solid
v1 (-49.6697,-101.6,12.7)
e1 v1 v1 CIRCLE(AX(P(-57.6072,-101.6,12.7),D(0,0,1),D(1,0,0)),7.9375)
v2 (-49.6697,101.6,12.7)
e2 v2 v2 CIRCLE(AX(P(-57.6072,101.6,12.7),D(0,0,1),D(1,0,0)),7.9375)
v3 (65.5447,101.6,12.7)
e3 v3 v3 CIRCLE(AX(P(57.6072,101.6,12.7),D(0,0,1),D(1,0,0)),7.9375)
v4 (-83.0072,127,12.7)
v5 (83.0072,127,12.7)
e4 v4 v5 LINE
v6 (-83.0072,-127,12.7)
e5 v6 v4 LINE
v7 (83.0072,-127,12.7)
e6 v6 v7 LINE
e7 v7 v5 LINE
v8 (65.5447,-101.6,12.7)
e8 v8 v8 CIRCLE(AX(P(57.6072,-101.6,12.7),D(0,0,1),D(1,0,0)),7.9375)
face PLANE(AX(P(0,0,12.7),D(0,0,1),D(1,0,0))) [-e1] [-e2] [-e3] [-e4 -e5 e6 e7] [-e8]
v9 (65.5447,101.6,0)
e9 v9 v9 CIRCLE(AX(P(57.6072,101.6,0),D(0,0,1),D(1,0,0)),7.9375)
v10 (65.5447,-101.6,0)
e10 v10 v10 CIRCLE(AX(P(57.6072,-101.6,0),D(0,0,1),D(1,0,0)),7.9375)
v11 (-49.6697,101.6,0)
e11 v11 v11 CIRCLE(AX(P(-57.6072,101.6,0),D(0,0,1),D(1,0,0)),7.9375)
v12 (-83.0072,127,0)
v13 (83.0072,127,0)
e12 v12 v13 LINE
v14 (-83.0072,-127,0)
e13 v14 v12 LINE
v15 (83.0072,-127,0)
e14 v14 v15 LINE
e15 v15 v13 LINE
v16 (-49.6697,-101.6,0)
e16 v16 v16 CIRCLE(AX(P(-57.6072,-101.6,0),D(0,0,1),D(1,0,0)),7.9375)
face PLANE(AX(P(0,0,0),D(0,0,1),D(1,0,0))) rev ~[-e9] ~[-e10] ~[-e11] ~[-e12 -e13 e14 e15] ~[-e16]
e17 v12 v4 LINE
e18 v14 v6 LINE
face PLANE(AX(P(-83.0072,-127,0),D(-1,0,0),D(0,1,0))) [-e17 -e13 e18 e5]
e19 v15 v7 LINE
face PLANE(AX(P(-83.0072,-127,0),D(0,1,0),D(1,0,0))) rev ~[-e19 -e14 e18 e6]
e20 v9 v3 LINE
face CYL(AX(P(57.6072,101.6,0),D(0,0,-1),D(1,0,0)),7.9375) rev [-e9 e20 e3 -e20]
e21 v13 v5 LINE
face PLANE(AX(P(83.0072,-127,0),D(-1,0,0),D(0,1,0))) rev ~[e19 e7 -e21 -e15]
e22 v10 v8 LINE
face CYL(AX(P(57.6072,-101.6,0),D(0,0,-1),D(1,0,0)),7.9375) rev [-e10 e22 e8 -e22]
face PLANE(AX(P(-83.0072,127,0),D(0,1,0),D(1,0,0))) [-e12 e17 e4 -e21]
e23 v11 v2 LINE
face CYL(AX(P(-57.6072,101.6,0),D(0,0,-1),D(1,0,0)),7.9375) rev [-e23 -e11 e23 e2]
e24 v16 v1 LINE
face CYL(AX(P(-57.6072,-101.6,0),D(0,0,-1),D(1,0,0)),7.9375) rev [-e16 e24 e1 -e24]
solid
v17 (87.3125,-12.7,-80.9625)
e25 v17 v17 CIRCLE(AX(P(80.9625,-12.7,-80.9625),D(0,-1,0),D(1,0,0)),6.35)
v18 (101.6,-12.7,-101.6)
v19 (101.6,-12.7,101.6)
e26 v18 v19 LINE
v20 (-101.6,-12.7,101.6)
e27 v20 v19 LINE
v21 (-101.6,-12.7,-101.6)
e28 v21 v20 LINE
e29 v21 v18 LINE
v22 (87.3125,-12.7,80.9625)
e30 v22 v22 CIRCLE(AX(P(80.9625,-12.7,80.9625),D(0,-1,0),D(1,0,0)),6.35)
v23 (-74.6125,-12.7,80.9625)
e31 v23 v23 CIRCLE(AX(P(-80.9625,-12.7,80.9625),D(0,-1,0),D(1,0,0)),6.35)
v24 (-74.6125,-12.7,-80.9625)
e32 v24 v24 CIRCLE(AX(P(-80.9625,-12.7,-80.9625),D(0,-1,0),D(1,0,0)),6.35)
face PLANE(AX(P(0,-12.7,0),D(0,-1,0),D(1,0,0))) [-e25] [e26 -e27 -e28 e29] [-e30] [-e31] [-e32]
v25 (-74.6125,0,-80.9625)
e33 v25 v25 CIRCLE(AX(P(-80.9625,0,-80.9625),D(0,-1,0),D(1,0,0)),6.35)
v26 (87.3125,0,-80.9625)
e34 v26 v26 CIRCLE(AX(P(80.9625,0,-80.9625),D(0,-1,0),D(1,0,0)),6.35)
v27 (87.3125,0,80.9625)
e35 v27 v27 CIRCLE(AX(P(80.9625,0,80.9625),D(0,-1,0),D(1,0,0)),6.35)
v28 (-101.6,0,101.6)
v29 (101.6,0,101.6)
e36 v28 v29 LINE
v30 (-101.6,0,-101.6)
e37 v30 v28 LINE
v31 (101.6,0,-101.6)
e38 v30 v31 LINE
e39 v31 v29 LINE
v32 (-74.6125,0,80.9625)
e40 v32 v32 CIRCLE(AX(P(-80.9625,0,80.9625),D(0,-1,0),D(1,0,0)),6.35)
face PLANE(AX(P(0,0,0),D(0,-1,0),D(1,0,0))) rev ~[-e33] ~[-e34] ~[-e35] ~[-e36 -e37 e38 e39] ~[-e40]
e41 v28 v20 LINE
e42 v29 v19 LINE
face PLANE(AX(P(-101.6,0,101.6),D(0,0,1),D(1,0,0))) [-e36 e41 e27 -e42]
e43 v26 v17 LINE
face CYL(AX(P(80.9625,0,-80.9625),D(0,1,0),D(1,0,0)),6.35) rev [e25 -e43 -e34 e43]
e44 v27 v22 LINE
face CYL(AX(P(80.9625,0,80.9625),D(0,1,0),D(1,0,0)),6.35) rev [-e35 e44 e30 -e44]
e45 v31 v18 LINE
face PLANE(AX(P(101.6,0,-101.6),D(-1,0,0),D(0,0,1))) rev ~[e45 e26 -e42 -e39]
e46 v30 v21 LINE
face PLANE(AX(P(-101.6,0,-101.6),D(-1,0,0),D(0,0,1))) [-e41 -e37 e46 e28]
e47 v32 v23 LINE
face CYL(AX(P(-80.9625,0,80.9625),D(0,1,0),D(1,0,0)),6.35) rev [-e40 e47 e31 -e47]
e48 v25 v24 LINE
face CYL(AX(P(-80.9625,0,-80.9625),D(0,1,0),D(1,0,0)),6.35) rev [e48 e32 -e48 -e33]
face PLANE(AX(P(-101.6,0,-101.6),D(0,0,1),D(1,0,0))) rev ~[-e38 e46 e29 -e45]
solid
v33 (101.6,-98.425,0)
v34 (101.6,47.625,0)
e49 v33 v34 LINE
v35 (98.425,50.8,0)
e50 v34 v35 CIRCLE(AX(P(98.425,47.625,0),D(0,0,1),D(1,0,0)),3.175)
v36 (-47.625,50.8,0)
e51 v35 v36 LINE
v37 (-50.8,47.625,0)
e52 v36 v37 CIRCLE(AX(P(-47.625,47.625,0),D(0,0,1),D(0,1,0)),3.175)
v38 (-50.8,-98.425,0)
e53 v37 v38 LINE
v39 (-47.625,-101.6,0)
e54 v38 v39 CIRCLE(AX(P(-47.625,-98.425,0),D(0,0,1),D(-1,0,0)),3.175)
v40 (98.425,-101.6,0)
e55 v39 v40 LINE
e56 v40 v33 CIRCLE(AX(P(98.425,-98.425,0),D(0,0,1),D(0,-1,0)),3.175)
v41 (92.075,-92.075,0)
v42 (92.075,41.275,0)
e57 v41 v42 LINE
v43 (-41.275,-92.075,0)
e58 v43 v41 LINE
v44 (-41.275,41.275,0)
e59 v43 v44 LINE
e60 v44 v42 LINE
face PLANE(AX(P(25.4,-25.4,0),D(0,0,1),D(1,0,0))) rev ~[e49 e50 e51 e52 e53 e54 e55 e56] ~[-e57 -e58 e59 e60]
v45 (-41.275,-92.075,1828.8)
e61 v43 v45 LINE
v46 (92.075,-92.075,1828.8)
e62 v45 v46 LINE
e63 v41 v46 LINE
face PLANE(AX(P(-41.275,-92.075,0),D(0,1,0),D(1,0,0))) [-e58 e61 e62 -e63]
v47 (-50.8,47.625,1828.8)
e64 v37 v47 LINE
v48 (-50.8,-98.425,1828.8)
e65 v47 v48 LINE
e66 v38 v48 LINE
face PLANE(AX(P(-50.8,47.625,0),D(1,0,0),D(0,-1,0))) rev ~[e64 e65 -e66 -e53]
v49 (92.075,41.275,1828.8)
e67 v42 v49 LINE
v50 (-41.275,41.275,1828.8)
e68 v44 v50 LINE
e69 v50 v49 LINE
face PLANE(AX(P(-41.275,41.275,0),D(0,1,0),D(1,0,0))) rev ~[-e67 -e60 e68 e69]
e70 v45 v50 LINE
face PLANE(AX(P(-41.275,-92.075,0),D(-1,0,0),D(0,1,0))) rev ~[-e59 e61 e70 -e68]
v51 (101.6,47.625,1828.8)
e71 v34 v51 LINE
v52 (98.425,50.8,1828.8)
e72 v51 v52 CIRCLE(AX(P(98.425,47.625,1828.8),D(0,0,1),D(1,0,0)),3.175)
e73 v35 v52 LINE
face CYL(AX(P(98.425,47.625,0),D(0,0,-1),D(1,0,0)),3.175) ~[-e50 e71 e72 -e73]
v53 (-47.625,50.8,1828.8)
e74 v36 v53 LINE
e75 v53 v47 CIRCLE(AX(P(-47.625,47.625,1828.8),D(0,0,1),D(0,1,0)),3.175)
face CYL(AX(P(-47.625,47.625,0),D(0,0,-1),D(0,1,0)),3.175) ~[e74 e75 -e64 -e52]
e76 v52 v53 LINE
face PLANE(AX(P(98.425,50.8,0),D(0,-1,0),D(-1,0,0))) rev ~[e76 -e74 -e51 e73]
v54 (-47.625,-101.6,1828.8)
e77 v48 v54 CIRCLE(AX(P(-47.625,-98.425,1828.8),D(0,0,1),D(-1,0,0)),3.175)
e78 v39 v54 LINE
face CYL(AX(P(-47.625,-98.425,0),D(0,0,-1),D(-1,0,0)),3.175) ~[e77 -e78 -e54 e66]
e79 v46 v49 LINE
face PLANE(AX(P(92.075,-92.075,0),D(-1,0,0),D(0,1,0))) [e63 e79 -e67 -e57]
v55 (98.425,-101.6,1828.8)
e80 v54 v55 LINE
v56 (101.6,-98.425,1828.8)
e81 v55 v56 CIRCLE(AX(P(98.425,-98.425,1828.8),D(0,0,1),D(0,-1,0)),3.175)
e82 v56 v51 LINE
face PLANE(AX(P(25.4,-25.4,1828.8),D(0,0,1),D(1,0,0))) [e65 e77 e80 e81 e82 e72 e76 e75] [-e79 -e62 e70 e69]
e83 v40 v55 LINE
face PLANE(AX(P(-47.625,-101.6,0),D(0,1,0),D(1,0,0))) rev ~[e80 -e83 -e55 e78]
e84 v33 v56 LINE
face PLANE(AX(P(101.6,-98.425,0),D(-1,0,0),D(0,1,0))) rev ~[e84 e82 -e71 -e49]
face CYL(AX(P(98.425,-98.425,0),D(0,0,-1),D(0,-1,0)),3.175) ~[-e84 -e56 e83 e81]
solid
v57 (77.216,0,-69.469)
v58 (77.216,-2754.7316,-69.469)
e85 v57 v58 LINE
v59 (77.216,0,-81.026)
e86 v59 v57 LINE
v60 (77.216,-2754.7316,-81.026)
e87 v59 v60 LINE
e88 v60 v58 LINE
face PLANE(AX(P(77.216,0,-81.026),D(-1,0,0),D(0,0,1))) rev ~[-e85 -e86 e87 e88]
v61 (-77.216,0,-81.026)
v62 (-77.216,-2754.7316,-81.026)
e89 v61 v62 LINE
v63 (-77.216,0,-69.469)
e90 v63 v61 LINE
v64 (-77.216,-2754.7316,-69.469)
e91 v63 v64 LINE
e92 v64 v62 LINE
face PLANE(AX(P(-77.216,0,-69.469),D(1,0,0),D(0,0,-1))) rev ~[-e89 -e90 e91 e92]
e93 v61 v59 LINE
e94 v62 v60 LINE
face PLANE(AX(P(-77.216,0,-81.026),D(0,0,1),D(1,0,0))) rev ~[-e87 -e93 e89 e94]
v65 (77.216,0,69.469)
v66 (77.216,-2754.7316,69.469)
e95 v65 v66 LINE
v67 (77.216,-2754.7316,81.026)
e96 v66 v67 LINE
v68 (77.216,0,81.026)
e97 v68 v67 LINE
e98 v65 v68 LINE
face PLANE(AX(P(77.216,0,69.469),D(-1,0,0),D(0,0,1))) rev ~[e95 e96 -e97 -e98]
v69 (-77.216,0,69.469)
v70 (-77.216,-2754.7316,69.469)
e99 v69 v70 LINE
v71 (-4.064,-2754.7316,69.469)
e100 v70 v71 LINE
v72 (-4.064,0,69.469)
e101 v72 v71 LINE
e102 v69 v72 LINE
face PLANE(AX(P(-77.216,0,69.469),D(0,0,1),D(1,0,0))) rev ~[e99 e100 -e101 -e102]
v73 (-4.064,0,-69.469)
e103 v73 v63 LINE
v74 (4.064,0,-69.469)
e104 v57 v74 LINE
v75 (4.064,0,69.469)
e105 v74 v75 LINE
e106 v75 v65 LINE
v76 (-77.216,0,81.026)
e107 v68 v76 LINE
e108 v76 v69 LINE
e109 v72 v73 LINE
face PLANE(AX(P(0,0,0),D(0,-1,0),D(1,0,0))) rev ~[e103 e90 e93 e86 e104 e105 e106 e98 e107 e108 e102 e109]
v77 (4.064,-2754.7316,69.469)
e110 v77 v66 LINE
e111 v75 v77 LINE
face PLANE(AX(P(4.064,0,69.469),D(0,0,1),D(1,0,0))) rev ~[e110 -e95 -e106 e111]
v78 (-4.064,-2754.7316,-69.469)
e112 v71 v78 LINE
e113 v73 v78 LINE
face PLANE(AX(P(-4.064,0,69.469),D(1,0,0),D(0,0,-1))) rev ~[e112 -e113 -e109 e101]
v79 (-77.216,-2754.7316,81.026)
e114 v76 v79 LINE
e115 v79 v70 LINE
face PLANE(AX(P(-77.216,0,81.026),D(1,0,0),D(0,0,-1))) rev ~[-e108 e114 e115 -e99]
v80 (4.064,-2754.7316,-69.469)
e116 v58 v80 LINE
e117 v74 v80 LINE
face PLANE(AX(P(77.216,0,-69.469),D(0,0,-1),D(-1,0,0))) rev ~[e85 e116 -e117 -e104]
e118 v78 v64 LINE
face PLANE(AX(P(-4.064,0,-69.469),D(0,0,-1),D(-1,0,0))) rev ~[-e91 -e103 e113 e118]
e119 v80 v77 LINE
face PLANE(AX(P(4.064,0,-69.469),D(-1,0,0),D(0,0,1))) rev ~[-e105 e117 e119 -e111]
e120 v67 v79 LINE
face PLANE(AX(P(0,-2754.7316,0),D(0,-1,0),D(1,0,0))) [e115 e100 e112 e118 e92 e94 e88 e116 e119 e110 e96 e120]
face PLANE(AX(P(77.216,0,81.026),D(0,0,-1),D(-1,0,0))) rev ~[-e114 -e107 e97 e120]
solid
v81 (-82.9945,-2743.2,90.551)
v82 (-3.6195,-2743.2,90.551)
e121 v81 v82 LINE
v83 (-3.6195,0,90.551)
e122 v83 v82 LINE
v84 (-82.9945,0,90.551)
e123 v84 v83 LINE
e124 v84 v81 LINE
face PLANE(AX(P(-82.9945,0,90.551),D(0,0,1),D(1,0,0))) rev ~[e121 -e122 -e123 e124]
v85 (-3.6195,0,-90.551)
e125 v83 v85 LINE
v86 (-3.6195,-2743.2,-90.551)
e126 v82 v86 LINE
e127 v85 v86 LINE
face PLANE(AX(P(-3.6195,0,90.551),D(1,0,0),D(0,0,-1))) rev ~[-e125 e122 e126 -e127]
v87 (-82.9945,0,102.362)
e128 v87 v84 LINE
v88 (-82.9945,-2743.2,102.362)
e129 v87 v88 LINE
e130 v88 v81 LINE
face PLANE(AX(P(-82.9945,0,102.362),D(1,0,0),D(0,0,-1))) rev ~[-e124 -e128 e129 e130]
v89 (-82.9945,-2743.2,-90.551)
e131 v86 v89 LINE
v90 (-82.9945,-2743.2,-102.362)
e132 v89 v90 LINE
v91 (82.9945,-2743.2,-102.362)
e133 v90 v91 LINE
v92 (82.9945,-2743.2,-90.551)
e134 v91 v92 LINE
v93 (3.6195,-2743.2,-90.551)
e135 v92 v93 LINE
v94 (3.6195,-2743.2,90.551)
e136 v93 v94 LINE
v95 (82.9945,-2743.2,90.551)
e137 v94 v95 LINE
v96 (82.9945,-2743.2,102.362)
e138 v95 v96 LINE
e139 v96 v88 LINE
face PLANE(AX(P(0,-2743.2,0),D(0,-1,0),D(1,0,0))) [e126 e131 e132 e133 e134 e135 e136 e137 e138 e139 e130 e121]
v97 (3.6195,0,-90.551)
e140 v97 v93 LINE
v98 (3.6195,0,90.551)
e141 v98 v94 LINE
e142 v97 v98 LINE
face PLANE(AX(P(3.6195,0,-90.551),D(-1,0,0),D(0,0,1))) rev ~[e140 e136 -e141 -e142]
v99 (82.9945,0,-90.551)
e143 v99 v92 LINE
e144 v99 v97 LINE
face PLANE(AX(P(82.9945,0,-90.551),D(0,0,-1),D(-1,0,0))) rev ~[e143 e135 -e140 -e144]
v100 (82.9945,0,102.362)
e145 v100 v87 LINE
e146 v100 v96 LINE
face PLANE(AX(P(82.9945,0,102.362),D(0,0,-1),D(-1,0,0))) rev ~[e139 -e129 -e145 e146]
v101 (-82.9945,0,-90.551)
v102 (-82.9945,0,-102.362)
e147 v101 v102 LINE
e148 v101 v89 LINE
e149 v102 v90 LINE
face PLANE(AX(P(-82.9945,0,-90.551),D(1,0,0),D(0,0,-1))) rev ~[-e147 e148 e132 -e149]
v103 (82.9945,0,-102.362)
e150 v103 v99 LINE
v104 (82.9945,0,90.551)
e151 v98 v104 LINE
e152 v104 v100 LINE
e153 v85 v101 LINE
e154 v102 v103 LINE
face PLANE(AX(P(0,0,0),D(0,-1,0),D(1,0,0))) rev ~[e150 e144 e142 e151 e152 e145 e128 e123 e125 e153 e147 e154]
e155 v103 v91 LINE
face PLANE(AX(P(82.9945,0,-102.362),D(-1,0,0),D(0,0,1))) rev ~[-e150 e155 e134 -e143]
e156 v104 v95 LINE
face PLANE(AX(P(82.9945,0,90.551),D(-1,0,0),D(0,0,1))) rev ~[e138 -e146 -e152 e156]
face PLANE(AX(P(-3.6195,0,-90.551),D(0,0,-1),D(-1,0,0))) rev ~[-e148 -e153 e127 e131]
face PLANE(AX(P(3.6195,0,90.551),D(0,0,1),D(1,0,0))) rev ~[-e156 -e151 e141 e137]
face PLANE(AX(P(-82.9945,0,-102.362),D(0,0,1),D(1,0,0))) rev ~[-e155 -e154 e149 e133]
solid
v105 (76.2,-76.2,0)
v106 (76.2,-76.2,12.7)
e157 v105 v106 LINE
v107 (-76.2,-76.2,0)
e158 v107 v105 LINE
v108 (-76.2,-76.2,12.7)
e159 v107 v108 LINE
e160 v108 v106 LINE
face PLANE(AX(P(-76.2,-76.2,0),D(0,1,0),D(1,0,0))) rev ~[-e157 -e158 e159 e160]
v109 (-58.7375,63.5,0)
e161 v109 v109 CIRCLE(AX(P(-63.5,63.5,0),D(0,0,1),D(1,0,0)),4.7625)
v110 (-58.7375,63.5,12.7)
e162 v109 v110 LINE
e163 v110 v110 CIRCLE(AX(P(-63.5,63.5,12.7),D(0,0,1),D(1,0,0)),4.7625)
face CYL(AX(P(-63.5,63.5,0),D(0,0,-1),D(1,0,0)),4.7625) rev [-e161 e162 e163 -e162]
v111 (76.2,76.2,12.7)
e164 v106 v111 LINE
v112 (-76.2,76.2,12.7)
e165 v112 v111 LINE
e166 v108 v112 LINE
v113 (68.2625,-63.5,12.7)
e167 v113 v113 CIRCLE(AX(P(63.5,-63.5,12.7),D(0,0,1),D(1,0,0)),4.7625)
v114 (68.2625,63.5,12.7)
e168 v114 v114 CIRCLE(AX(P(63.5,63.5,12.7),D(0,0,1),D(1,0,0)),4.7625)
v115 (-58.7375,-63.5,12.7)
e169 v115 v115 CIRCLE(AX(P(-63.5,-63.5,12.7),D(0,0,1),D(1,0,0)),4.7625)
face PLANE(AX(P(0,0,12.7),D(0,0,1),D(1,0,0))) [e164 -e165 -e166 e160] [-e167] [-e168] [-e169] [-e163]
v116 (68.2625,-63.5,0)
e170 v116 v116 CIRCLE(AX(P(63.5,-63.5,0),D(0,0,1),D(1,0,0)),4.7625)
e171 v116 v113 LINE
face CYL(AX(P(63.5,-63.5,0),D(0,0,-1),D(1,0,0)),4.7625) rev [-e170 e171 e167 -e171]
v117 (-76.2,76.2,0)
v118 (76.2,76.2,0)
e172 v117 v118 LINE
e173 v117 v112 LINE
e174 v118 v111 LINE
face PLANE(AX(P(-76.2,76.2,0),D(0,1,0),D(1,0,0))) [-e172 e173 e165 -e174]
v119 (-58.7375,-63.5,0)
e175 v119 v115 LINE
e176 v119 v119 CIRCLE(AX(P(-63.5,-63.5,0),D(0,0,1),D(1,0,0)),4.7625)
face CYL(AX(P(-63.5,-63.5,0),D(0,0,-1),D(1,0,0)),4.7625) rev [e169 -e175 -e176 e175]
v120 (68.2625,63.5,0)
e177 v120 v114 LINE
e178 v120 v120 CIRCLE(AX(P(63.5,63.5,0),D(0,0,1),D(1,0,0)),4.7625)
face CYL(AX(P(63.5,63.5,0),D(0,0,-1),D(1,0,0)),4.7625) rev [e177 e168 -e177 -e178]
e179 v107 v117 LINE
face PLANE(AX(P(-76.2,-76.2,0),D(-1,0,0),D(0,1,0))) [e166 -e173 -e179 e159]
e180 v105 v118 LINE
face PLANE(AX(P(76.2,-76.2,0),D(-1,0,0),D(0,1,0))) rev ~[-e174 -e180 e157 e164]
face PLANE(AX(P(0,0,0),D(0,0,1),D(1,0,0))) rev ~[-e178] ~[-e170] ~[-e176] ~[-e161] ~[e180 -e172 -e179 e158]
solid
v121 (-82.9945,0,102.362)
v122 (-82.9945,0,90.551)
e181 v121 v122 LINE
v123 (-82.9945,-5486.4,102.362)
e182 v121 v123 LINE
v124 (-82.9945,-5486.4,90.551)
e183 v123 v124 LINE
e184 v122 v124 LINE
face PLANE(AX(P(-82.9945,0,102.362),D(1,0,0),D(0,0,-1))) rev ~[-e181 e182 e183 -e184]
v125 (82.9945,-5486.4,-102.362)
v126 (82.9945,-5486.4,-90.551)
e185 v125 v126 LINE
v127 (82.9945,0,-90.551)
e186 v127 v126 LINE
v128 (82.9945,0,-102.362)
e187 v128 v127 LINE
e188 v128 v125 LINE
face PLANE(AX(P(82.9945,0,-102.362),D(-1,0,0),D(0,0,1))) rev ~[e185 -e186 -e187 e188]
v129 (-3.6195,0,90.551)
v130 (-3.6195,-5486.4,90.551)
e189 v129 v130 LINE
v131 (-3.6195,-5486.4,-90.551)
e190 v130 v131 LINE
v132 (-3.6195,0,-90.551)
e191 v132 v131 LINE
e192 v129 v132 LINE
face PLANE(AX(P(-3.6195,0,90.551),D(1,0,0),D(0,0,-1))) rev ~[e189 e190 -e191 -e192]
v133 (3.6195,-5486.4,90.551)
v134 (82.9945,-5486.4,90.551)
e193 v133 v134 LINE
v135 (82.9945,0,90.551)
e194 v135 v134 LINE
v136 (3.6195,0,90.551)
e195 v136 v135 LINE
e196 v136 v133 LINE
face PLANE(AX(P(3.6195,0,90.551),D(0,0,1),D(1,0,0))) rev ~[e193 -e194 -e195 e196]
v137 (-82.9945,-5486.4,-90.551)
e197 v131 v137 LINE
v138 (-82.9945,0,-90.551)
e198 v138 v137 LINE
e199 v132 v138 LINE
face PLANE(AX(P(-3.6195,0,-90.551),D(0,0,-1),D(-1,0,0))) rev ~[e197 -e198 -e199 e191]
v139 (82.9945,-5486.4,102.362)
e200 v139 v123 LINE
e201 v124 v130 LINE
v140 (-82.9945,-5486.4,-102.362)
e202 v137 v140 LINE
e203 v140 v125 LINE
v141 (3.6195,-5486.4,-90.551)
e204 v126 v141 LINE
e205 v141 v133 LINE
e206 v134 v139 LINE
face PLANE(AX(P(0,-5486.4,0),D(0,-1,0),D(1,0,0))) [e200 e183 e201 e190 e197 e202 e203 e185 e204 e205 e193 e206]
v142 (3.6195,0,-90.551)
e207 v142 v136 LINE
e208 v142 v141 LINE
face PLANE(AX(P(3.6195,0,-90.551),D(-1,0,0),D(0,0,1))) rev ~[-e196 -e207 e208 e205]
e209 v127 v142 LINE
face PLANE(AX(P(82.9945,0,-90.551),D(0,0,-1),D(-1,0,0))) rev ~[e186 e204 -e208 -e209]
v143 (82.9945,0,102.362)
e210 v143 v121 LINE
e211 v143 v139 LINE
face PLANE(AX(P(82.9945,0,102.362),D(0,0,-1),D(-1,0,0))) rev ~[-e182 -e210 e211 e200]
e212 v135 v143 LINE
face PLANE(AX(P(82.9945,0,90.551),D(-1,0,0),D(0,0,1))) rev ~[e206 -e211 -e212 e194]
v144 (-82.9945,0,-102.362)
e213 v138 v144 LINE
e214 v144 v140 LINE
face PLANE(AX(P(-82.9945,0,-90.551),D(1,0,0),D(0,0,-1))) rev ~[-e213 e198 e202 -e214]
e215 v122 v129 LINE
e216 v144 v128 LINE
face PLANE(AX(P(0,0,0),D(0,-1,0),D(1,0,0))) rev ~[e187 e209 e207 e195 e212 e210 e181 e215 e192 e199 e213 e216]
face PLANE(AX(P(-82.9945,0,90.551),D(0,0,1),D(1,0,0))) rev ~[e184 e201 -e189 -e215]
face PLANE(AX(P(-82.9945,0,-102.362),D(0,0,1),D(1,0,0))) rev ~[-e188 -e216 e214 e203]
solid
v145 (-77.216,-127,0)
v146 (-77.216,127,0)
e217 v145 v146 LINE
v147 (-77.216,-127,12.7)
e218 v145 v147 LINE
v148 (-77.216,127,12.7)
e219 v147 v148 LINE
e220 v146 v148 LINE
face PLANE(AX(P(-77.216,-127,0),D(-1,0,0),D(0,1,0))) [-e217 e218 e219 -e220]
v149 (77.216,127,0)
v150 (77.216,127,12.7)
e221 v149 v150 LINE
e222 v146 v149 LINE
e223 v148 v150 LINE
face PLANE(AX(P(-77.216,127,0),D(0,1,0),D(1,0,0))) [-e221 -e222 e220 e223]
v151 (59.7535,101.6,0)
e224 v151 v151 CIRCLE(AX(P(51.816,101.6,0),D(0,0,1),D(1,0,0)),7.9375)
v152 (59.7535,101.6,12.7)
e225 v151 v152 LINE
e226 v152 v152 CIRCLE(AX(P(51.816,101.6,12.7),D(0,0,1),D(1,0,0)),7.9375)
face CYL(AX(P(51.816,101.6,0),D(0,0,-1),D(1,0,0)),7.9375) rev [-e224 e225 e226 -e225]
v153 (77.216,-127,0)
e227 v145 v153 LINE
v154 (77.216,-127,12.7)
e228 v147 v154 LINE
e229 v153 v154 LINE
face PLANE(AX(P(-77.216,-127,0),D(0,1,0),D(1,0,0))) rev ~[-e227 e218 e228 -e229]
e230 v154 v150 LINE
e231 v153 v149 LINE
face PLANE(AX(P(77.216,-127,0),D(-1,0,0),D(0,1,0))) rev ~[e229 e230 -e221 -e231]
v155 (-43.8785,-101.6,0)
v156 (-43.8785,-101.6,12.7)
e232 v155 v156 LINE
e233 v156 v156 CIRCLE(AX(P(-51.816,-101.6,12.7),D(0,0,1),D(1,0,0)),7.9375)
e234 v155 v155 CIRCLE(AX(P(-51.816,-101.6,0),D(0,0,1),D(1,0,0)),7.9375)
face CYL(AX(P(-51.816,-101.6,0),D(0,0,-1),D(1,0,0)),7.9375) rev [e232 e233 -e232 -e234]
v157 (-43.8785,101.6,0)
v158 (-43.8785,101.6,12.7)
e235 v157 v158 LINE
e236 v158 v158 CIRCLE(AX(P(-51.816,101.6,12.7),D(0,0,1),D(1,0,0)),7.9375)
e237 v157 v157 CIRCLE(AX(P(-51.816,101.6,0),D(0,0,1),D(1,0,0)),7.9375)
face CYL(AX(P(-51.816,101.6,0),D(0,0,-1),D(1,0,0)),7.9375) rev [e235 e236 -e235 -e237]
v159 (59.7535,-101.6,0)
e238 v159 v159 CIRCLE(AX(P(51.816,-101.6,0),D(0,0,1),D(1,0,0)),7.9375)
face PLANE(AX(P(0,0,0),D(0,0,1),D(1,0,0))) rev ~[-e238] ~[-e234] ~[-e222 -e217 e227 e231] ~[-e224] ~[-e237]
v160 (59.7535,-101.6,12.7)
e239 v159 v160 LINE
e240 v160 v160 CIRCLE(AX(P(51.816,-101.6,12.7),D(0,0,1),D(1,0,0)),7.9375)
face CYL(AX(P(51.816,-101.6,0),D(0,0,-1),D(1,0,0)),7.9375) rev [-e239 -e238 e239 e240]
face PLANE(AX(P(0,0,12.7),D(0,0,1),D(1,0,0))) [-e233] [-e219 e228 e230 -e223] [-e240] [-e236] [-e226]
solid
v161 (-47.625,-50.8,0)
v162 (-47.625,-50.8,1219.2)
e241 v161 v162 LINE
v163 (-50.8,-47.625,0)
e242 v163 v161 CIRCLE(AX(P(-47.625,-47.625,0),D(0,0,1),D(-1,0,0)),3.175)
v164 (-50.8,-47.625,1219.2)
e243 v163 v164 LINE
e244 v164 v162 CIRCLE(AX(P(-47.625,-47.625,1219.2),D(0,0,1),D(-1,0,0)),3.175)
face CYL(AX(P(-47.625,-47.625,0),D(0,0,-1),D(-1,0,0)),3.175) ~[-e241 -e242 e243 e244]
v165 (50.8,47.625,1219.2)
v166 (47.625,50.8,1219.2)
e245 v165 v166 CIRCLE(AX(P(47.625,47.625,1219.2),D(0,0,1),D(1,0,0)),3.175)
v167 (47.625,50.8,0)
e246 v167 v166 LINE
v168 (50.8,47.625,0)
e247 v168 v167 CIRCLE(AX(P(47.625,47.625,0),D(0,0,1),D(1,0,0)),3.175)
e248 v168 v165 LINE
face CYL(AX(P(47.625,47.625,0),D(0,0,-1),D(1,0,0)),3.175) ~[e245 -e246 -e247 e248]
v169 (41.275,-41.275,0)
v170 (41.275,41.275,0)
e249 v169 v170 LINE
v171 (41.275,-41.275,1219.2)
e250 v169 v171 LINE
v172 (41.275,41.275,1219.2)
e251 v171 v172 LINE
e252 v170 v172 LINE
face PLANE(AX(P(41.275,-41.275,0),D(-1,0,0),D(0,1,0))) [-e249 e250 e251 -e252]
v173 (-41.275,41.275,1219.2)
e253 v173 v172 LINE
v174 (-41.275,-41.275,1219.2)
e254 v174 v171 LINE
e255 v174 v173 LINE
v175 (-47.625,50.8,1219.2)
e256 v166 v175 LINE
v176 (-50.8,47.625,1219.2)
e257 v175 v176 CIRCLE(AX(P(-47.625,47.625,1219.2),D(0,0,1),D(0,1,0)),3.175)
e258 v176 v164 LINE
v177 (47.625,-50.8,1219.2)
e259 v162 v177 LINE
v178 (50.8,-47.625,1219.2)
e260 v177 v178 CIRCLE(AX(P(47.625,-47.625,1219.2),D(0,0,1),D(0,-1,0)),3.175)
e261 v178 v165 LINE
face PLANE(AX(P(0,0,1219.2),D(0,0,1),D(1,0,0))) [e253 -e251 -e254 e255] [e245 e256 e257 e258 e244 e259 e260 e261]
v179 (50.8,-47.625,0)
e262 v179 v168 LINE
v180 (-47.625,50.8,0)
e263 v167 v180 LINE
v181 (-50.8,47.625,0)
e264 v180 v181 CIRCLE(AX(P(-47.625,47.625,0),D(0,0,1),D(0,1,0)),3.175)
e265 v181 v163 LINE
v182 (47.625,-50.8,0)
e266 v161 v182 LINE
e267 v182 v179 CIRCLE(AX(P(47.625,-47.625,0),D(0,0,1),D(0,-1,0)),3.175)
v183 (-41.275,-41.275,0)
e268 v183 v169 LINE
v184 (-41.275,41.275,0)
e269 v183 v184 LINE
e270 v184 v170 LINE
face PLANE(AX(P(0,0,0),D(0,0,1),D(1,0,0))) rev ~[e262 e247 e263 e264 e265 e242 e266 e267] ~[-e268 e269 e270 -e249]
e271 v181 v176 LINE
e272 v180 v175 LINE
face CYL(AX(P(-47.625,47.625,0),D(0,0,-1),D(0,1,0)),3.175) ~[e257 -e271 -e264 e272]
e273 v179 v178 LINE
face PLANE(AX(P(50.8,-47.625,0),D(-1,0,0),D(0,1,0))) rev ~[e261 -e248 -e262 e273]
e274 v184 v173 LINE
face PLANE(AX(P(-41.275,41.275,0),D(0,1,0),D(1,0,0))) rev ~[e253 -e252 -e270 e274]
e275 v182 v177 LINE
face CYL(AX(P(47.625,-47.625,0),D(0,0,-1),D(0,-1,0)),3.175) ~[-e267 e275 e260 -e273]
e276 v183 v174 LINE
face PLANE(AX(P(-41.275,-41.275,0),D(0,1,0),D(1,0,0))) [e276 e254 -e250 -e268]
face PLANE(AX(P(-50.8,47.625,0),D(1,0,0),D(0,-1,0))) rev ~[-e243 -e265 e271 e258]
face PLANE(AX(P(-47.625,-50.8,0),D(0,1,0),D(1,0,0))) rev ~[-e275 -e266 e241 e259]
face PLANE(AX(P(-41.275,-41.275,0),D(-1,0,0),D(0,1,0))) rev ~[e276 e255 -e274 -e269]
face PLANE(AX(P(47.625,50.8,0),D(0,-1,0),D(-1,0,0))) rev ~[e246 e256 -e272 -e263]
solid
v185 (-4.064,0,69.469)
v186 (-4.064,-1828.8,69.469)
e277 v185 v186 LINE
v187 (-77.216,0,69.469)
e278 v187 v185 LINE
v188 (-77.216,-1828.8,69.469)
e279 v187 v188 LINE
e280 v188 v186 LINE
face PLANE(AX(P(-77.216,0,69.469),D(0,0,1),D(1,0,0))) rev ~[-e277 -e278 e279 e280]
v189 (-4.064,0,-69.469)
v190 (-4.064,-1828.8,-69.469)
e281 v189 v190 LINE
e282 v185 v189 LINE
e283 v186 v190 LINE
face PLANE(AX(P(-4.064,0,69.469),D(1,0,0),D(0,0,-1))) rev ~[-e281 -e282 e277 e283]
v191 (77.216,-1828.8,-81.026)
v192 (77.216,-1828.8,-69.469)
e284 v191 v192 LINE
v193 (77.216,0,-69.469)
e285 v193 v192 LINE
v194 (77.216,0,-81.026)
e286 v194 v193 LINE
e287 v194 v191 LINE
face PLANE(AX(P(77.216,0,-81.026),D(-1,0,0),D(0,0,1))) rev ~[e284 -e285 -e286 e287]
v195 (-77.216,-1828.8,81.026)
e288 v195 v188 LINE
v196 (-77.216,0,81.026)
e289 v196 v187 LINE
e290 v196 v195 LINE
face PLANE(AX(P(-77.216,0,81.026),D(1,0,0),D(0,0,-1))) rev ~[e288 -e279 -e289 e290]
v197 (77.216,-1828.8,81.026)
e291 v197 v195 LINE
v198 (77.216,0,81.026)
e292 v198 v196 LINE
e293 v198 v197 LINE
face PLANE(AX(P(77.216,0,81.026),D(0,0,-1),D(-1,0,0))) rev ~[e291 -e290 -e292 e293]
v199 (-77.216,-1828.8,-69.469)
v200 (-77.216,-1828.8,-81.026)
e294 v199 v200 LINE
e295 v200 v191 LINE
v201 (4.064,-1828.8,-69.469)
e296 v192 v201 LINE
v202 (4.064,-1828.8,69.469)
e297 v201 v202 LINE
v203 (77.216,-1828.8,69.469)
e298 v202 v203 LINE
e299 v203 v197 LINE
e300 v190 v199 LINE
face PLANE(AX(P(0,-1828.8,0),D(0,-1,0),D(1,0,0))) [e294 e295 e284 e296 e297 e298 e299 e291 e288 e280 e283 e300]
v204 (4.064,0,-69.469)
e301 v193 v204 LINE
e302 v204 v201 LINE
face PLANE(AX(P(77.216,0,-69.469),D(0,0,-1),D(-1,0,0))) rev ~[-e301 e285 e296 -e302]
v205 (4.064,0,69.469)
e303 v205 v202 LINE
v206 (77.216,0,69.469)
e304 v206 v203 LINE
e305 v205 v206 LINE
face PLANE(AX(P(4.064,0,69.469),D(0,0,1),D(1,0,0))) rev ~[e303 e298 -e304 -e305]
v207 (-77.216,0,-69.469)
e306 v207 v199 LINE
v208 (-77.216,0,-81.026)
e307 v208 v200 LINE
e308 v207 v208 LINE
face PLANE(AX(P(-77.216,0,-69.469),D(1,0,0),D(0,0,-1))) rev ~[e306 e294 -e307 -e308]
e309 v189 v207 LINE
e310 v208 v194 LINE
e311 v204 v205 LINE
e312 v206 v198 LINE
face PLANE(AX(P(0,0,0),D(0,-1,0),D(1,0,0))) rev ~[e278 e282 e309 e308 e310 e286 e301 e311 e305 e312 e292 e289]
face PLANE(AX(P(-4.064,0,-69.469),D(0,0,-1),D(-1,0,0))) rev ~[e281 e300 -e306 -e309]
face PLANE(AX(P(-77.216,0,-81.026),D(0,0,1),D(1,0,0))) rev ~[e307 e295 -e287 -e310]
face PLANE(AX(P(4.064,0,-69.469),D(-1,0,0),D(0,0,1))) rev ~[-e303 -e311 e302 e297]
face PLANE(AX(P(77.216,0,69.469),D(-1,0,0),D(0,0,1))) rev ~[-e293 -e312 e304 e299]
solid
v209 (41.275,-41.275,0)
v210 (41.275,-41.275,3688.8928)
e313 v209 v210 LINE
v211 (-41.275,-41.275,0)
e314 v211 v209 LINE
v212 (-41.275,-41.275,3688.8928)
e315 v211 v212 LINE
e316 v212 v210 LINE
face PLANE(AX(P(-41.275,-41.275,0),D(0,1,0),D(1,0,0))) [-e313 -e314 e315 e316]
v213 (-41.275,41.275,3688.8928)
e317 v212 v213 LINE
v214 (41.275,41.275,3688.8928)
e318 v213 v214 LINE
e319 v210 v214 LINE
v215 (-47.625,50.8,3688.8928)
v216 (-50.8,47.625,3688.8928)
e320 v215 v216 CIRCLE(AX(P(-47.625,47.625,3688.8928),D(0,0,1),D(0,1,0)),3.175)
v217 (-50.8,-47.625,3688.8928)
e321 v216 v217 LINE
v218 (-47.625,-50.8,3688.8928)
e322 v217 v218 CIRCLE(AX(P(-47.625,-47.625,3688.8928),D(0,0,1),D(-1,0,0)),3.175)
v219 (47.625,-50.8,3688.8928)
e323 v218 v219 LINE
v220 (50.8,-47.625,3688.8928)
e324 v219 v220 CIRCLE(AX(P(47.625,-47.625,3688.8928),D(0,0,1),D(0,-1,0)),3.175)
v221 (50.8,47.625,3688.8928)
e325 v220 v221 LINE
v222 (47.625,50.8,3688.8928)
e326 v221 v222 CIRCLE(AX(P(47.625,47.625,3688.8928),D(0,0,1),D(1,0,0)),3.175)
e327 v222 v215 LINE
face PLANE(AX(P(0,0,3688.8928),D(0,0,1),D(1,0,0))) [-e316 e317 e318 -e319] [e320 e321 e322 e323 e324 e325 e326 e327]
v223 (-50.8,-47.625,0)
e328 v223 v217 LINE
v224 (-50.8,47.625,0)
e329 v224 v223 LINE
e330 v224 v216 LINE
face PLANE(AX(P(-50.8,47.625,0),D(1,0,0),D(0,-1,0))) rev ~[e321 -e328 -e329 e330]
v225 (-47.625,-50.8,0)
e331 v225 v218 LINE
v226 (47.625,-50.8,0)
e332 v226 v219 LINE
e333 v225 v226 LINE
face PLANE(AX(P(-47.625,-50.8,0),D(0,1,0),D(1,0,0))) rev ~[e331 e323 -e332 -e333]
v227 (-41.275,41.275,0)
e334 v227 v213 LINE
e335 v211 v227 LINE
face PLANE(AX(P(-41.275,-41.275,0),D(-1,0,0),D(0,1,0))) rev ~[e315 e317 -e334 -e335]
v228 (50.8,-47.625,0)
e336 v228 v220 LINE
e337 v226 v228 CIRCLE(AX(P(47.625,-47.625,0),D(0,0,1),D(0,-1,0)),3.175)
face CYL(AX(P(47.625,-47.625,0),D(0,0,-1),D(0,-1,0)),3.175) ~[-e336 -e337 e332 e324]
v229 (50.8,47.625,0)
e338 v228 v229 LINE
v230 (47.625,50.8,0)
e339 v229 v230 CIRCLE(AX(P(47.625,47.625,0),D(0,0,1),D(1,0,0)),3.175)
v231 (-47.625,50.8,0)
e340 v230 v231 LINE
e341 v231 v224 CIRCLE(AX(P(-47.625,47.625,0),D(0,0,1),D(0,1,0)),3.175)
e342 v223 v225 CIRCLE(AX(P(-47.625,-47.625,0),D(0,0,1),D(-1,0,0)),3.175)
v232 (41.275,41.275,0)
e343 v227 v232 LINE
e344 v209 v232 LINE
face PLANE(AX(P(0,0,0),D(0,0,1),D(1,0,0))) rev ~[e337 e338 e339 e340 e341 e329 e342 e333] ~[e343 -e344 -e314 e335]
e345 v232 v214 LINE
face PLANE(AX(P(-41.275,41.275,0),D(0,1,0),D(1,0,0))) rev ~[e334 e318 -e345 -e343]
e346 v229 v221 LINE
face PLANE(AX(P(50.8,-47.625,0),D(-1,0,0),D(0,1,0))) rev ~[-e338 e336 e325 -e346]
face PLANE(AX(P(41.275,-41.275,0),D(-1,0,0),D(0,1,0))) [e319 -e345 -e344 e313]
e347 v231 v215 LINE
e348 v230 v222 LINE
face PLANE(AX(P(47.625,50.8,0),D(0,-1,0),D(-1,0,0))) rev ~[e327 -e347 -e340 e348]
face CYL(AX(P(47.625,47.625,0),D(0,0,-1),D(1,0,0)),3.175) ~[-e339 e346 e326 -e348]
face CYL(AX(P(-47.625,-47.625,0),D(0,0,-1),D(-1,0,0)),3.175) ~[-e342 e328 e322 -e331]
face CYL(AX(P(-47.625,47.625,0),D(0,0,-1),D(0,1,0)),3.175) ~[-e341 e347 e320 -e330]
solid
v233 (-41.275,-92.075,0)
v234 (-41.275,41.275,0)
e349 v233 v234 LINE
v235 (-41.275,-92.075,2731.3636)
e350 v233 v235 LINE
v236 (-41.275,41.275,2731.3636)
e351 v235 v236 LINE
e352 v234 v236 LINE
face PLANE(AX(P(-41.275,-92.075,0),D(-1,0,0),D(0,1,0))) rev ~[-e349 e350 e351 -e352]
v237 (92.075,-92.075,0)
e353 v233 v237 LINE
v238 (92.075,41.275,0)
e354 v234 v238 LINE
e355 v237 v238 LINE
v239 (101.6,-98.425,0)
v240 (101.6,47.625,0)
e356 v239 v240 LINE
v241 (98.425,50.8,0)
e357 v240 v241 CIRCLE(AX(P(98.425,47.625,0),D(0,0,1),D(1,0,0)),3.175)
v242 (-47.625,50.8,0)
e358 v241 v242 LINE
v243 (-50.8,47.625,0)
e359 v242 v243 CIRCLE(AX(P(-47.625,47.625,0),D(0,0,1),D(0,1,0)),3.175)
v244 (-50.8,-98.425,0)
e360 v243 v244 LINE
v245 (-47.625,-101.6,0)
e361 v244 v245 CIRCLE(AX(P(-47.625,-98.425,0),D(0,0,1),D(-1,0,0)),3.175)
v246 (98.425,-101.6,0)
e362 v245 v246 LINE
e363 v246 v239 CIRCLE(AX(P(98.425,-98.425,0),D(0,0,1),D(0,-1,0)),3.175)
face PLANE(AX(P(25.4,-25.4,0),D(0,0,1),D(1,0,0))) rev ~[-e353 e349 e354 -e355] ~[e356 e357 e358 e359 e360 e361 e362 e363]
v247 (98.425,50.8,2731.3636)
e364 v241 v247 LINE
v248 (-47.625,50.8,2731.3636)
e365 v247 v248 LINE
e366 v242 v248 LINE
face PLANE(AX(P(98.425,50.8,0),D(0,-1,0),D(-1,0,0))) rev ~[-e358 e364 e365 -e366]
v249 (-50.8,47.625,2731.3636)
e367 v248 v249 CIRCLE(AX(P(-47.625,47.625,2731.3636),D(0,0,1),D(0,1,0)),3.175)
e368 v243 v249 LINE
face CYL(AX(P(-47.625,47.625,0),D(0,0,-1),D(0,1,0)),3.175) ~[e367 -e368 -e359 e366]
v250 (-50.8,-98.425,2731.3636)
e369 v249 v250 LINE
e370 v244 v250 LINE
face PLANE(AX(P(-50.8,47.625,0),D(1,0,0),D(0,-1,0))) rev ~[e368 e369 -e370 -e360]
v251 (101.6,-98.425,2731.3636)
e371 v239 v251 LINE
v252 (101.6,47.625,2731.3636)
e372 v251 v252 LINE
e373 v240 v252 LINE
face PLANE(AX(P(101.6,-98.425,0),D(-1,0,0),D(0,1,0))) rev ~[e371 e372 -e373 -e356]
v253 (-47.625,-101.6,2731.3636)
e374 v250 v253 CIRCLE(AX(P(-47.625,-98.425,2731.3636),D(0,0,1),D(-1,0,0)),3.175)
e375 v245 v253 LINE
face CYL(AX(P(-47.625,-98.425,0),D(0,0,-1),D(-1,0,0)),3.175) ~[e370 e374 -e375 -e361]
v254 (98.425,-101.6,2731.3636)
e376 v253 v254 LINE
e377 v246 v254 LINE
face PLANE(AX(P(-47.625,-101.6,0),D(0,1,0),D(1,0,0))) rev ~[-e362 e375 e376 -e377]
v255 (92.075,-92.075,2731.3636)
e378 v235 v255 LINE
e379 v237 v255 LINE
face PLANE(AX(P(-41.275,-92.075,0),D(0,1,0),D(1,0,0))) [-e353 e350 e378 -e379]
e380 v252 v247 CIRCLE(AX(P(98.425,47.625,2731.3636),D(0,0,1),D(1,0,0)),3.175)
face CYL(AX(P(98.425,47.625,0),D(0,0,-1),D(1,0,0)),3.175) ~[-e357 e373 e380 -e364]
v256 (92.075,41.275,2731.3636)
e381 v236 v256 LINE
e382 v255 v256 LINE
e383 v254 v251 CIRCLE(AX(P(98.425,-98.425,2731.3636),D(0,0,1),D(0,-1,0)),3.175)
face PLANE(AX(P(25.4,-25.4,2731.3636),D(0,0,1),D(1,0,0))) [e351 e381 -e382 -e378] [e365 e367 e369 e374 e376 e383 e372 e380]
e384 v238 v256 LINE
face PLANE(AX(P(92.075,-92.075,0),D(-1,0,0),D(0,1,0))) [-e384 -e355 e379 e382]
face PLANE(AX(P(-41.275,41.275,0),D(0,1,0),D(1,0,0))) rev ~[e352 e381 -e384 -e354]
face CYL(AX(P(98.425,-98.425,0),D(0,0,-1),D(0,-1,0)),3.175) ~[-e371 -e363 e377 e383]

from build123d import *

# Parameters (mm, degrees)
F3_DEPTH  = 5486.4
F4_DEPTH  = 2743.2
F6_DEPTH  = 2754.7316
F7_DEPTH  = 1828.8
F8_W      = 82.55
F8_H      = 82.55
F9_DEPTH  = 1219.2
F10_W     = 133.35
F10_H     = 133.35
F11_DEPTH = 1828.8
F12_DEPTH = 3688.8928
F13_W     = 166.0144
F13_H     = 254
F13_R     = 7.9375
F14_DEPTH = 12.7
F15_W     = 152.4
F15_H     = 152.4
F15_R     = 4.7625
F16_DEPTH = 12.7
F17_W     = 154.432
F17_H     = 254
F17_R     = 7.9375
F18_DEPTH = 12.7
F19_W     = 203.2
F19_H     = 203.2
F19_R     = 6.35
F20_DEPTH = 12.7
F21_DEPTH = 2731.3636


# Not quite as in the source:
# - a variable given as a bare number and used for a length is read in inches; the dataset says mm whatever the document's units were


with BuildPart() as f3:
    # F2 (on Front) → F3 (new body)
    with BuildSketch(Plane.XZ):
        Polygon((-3.6195, 90.551), (-3.6195, 0), (-3.6195, -90.551), (-82.9945, -90.551), (-82.9945, -102.362), (0, -102.362), (82.9945, -102.362), (82.9945, -90.551), (3.6195, -90.551), (3.6195, 0), (3.6195, 90.551), (82.9945, 90.551), (82.9945, 102.362), (0, 102.362), (-82.9945, 102.362), (-82.9945, 90.551), align=None)
    extrude(amount=F3_DEPTH)


with BuildPart() as f4:
    # F2 (on Front) → F4 (new body)
    with BuildSketch(Plane.XZ):
        Polygon((-3.6195, 90.551), (-3.6195, 0), (-3.6195, -90.551), (-82.9945, -90.551), (-82.9945, -102.362), (0, -102.362), (82.9945, -102.362), (82.9945, -90.551), (3.6195, -90.551), (3.6195, 0), (3.6195, 90.551), (82.9945, 90.551), (82.9945, 102.362), (0, 102.362), (-82.9945, 102.362), (-82.9945, 90.551), align=None)
    extrude(amount=F4_DEPTH)


with BuildPart() as f6:
    # F5 (on Front) → F6 (new body)
    with BuildSketch(Plane.XZ):
        Polygon((-4.064, 69.469), (-4.064, 0), (-4.064, -69.469), (-77.216, -69.469), (-77.216, -81.026), (0, -81.026), (77.216, -81.026), (77.216, -69.469), (4.064, -69.469), (4.064, 0), (4.064, 69.469), (77.216, 69.469), (77.216, 81.026), (0, 81.026), (-77.216, 81.026), (-77.216, 69.469), align=None)
    extrude(amount=F6_DEPTH)


with BuildPart() as f7:
    # F5 (on Front) → F7 (new body)
    with BuildSketch(Plane.XZ):
        Polygon((-4.064, 69.469), (-4.064, 0), (-4.064, -69.469), (-77.216, -69.469), (-77.216, -81.026), (0, -81.026), (77.216, -81.026), (77.216, -69.469), (4.064, -69.469), (4.064, 0), (4.064, 69.469), (77.216, 69.469), (77.216, 81.026), (0, 81.026), (-77.216, 81.026), (-77.216, 69.469), align=None)
    extrude(amount=F7_DEPTH)


with BuildPart() as f9:
    # F8 (on Top) → F9 (new body)
    with BuildSketch(Plane.XY):
        with BuildLine():
            Line((-47.625, -50.8), (47.625, -50.8))
            ThreePointArc((47.625, -50.8), (49.8700640303, -49.8700640303), (50.8, -47.625))
            Line((50.8, -47.625), (50.8, 47.625))
            ThreePointArc((50.8, 47.625), (49.8700640303, 49.8700640303), (47.625, 50.8))
            Line((47.625, 50.8), (-47.625, 50.8))
            ThreePointArc((-47.625, 50.8), (-49.8700640303, 49.8700640303), (-50.8, 47.625))
            Line((-50.8, 47.625), (-50.8, -47.625))
            ThreePointArc((-50.8, -47.625), (-49.8700640303, -49.8700640303), (-47.625, -50.8))
        make_face()
        Rectangle(F8_W, F8_H, mode=Mode.SUBTRACT)
    extrude(amount=F9_DEPTH)


with BuildPart() as f11:
    # F10 (on Top) → F11 (new body)
    with BuildSketch(Plane.XY):
        with BuildLine():
            Line((-47.625, -101.6), (98.425, -101.6))
            ThreePointArc((98.425, -101.6), (100.6700640303, -100.6700640303), (101.6, -98.425))
            Line((101.6, -98.425), (101.6, 47.625))
            ThreePointArc((101.6, 47.625), (100.6700640303, 49.8700640303), (98.425, 50.8))
            Line((98.425, 50.8), (-47.625, 50.8))
            ThreePointArc((-47.625, 50.8), (-49.8700640303, 49.8700640303), (-50.8, 47.625))
            Line((-50.8, 47.625), (-50.8, -98.425))
            ThreePointArc((-50.8, -98.425), (-49.8700640303, -100.6700640303), (-47.625, -101.6))
        make_face()
        with Locations((25.4, -25.4)):
            Rectangle(F10_W, F10_H, mode=Mode.SUBTRACT)
    extrude(amount=F11_DEPTH)


with BuildPart() as f12:
    # F8 (on Top) → F12 (new body)
    with BuildSketch(Plane.XY):
        with BuildLine():
            Line((-47.625, -50.8), (47.625, -50.8))
            ThreePointArc((47.625, -50.8), (49.8700640303, -49.8700640303), (50.8, -47.625))
            Line((50.8, -47.625), (50.8, 47.625))
            ThreePointArc((50.8, 47.625), (49.8700640303, 49.8700640303), (47.625, 50.8))
            Line((47.625, 50.8), (-47.625, 50.8))
            ThreePointArc((-47.625, 50.8), (-49.8700640303, 49.8700640303), (-50.8, 47.625))
            Line((-50.8, 47.625), (-50.8, -47.625))
            ThreePointArc((-50.8, -47.625), (-49.8700640303, -49.8700640303), (-47.625, -50.8))
        make_face()
        Rectangle(F8_W, F8_H, mode=Mode.SUBTRACT)
    extrude(amount=F12_DEPTH)


with BuildPart() as f14:
    # F13 (on Top) → F14 (new body)
    with BuildSketch(Plane.XY):
        Rectangle(F13_W, F13_H)
        with Locations((-57.6072, -101.6)):
            Circle(F13_R, mode=Mode.SUBTRACT)
        with Locations((57.6072, -101.6)):
            Circle(F13_R, mode=Mode.SUBTRACT)
        with Locations((-57.6072, 101.6)):
            Circle(F13_R, mode=Mode.SUBTRACT)
        with Locations((57.6072, 101.6)):
            Circle(F13_R, mode=Mode.SUBTRACT)
    extrude(amount=F14_DEPTH)


with BuildPart() as f16:
    # F15 (on Top) → F16 (new body)
    with BuildSketch(Plane.XY):
        Rectangle(F15_W, F15_H)
        with Locations((-63.5, -63.5)):
            Circle(F15_R, mode=Mode.SUBTRACT)
        with Locations((63.5, -63.5)):
            Circle(F15_R, mode=Mode.SUBTRACT)
        with Locations((-63.5, 63.5)):
            Circle(F15_R, mode=Mode.SUBTRACT)
        with Locations((63.5, 63.5)):
            Circle(F15_R, mode=Mode.SUBTRACT)
    extrude(amount=F16_DEPTH)


with BuildPart() as f18:
    # F17 (on Top) → F18 (new body)
    with BuildSketch(Plane.XY):
        Rectangle(F17_W, F17_H)
        with Locations((-51.816, -101.6)):
            Circle(F17_R, mode=Mode.SUBTRACT)
        with Locations((51.816, -101.6)):
            Circle(F17_R, mode=Mode.SUBTRACT)
        with Locations((-51.816, 101.6)):
            Circle(F17_R, mode=Mode.SUBTRACT)
        with Locations((51.816, 101.6)):
            Circle(F17_R, mode=Mode.SUBTRACT)
    extrude(amount=F18_DEPTH)


with BuildPart() as f20:
    # F19 (on Front) → F20 (new body)
    with BuildSketch(Plane.XZ):
        Rectangle(F19_W, F19_H)
        with Locations((-80.9625, -80.9625)):
            Circle(F19_R, mode=Mode.SUBTRACT)
        with Locations((80.9625, -80.9625)):
            Circle(F19_R, mode=Mode.SUBTRACT)
        with Locations((-80.9625, 80.9625)):
            Circle(F19_R, mode=Mode.SUBTRACT)
        with Locations((80.9625, 80.9625)):
            Circle(F19_R, mode=Mode.SUBTRACT)
    extrude(amount=F20_DEPTH)


with BuildPart() as f21:
    # F10 (on Top) → F21 (new body)
    with BuildSketch(Plane.XY):
        with BuildLine():
            Line((-47.625, -101.6), (98.425, -101.6))
            ThreePointArc((98.425, -101.6), (100.6700640303, -100.6700640303), (101.6, -98.425))
            Line((101.6, -98.425), (101.6, 47.625))
            ThreePointArc((101.6, 47.625), (100.6700640303, 49.8700640303), (98.425, 50.8))
            Line((98.425, 50.8), (-47.625, 50.8))
            ThreePointArc((-47.625, 50.8), (-49.8700640303, 49.8700640303), (-50.8, 47.625))
            Line((-50.8, 47.625), (-50.8, -98.425))
            ThreePointArc((-50.8, -98.425), (-49.8700640303, -100.6700640303), (-47.625, -101.6))
        make_face()
        with Locations((25.4, -25.4)):
            Rectangle(F10_W, F10_H, mode=Mode.SUBTRACT)
    extrude(amount=F21_DEPTH)


solid = Compound([f3.part, f4.part, f6.part, f7.part, f9.part, f11.part, f12.part, f14.part, f16.part, f18.part, f20.part, f21.part])
